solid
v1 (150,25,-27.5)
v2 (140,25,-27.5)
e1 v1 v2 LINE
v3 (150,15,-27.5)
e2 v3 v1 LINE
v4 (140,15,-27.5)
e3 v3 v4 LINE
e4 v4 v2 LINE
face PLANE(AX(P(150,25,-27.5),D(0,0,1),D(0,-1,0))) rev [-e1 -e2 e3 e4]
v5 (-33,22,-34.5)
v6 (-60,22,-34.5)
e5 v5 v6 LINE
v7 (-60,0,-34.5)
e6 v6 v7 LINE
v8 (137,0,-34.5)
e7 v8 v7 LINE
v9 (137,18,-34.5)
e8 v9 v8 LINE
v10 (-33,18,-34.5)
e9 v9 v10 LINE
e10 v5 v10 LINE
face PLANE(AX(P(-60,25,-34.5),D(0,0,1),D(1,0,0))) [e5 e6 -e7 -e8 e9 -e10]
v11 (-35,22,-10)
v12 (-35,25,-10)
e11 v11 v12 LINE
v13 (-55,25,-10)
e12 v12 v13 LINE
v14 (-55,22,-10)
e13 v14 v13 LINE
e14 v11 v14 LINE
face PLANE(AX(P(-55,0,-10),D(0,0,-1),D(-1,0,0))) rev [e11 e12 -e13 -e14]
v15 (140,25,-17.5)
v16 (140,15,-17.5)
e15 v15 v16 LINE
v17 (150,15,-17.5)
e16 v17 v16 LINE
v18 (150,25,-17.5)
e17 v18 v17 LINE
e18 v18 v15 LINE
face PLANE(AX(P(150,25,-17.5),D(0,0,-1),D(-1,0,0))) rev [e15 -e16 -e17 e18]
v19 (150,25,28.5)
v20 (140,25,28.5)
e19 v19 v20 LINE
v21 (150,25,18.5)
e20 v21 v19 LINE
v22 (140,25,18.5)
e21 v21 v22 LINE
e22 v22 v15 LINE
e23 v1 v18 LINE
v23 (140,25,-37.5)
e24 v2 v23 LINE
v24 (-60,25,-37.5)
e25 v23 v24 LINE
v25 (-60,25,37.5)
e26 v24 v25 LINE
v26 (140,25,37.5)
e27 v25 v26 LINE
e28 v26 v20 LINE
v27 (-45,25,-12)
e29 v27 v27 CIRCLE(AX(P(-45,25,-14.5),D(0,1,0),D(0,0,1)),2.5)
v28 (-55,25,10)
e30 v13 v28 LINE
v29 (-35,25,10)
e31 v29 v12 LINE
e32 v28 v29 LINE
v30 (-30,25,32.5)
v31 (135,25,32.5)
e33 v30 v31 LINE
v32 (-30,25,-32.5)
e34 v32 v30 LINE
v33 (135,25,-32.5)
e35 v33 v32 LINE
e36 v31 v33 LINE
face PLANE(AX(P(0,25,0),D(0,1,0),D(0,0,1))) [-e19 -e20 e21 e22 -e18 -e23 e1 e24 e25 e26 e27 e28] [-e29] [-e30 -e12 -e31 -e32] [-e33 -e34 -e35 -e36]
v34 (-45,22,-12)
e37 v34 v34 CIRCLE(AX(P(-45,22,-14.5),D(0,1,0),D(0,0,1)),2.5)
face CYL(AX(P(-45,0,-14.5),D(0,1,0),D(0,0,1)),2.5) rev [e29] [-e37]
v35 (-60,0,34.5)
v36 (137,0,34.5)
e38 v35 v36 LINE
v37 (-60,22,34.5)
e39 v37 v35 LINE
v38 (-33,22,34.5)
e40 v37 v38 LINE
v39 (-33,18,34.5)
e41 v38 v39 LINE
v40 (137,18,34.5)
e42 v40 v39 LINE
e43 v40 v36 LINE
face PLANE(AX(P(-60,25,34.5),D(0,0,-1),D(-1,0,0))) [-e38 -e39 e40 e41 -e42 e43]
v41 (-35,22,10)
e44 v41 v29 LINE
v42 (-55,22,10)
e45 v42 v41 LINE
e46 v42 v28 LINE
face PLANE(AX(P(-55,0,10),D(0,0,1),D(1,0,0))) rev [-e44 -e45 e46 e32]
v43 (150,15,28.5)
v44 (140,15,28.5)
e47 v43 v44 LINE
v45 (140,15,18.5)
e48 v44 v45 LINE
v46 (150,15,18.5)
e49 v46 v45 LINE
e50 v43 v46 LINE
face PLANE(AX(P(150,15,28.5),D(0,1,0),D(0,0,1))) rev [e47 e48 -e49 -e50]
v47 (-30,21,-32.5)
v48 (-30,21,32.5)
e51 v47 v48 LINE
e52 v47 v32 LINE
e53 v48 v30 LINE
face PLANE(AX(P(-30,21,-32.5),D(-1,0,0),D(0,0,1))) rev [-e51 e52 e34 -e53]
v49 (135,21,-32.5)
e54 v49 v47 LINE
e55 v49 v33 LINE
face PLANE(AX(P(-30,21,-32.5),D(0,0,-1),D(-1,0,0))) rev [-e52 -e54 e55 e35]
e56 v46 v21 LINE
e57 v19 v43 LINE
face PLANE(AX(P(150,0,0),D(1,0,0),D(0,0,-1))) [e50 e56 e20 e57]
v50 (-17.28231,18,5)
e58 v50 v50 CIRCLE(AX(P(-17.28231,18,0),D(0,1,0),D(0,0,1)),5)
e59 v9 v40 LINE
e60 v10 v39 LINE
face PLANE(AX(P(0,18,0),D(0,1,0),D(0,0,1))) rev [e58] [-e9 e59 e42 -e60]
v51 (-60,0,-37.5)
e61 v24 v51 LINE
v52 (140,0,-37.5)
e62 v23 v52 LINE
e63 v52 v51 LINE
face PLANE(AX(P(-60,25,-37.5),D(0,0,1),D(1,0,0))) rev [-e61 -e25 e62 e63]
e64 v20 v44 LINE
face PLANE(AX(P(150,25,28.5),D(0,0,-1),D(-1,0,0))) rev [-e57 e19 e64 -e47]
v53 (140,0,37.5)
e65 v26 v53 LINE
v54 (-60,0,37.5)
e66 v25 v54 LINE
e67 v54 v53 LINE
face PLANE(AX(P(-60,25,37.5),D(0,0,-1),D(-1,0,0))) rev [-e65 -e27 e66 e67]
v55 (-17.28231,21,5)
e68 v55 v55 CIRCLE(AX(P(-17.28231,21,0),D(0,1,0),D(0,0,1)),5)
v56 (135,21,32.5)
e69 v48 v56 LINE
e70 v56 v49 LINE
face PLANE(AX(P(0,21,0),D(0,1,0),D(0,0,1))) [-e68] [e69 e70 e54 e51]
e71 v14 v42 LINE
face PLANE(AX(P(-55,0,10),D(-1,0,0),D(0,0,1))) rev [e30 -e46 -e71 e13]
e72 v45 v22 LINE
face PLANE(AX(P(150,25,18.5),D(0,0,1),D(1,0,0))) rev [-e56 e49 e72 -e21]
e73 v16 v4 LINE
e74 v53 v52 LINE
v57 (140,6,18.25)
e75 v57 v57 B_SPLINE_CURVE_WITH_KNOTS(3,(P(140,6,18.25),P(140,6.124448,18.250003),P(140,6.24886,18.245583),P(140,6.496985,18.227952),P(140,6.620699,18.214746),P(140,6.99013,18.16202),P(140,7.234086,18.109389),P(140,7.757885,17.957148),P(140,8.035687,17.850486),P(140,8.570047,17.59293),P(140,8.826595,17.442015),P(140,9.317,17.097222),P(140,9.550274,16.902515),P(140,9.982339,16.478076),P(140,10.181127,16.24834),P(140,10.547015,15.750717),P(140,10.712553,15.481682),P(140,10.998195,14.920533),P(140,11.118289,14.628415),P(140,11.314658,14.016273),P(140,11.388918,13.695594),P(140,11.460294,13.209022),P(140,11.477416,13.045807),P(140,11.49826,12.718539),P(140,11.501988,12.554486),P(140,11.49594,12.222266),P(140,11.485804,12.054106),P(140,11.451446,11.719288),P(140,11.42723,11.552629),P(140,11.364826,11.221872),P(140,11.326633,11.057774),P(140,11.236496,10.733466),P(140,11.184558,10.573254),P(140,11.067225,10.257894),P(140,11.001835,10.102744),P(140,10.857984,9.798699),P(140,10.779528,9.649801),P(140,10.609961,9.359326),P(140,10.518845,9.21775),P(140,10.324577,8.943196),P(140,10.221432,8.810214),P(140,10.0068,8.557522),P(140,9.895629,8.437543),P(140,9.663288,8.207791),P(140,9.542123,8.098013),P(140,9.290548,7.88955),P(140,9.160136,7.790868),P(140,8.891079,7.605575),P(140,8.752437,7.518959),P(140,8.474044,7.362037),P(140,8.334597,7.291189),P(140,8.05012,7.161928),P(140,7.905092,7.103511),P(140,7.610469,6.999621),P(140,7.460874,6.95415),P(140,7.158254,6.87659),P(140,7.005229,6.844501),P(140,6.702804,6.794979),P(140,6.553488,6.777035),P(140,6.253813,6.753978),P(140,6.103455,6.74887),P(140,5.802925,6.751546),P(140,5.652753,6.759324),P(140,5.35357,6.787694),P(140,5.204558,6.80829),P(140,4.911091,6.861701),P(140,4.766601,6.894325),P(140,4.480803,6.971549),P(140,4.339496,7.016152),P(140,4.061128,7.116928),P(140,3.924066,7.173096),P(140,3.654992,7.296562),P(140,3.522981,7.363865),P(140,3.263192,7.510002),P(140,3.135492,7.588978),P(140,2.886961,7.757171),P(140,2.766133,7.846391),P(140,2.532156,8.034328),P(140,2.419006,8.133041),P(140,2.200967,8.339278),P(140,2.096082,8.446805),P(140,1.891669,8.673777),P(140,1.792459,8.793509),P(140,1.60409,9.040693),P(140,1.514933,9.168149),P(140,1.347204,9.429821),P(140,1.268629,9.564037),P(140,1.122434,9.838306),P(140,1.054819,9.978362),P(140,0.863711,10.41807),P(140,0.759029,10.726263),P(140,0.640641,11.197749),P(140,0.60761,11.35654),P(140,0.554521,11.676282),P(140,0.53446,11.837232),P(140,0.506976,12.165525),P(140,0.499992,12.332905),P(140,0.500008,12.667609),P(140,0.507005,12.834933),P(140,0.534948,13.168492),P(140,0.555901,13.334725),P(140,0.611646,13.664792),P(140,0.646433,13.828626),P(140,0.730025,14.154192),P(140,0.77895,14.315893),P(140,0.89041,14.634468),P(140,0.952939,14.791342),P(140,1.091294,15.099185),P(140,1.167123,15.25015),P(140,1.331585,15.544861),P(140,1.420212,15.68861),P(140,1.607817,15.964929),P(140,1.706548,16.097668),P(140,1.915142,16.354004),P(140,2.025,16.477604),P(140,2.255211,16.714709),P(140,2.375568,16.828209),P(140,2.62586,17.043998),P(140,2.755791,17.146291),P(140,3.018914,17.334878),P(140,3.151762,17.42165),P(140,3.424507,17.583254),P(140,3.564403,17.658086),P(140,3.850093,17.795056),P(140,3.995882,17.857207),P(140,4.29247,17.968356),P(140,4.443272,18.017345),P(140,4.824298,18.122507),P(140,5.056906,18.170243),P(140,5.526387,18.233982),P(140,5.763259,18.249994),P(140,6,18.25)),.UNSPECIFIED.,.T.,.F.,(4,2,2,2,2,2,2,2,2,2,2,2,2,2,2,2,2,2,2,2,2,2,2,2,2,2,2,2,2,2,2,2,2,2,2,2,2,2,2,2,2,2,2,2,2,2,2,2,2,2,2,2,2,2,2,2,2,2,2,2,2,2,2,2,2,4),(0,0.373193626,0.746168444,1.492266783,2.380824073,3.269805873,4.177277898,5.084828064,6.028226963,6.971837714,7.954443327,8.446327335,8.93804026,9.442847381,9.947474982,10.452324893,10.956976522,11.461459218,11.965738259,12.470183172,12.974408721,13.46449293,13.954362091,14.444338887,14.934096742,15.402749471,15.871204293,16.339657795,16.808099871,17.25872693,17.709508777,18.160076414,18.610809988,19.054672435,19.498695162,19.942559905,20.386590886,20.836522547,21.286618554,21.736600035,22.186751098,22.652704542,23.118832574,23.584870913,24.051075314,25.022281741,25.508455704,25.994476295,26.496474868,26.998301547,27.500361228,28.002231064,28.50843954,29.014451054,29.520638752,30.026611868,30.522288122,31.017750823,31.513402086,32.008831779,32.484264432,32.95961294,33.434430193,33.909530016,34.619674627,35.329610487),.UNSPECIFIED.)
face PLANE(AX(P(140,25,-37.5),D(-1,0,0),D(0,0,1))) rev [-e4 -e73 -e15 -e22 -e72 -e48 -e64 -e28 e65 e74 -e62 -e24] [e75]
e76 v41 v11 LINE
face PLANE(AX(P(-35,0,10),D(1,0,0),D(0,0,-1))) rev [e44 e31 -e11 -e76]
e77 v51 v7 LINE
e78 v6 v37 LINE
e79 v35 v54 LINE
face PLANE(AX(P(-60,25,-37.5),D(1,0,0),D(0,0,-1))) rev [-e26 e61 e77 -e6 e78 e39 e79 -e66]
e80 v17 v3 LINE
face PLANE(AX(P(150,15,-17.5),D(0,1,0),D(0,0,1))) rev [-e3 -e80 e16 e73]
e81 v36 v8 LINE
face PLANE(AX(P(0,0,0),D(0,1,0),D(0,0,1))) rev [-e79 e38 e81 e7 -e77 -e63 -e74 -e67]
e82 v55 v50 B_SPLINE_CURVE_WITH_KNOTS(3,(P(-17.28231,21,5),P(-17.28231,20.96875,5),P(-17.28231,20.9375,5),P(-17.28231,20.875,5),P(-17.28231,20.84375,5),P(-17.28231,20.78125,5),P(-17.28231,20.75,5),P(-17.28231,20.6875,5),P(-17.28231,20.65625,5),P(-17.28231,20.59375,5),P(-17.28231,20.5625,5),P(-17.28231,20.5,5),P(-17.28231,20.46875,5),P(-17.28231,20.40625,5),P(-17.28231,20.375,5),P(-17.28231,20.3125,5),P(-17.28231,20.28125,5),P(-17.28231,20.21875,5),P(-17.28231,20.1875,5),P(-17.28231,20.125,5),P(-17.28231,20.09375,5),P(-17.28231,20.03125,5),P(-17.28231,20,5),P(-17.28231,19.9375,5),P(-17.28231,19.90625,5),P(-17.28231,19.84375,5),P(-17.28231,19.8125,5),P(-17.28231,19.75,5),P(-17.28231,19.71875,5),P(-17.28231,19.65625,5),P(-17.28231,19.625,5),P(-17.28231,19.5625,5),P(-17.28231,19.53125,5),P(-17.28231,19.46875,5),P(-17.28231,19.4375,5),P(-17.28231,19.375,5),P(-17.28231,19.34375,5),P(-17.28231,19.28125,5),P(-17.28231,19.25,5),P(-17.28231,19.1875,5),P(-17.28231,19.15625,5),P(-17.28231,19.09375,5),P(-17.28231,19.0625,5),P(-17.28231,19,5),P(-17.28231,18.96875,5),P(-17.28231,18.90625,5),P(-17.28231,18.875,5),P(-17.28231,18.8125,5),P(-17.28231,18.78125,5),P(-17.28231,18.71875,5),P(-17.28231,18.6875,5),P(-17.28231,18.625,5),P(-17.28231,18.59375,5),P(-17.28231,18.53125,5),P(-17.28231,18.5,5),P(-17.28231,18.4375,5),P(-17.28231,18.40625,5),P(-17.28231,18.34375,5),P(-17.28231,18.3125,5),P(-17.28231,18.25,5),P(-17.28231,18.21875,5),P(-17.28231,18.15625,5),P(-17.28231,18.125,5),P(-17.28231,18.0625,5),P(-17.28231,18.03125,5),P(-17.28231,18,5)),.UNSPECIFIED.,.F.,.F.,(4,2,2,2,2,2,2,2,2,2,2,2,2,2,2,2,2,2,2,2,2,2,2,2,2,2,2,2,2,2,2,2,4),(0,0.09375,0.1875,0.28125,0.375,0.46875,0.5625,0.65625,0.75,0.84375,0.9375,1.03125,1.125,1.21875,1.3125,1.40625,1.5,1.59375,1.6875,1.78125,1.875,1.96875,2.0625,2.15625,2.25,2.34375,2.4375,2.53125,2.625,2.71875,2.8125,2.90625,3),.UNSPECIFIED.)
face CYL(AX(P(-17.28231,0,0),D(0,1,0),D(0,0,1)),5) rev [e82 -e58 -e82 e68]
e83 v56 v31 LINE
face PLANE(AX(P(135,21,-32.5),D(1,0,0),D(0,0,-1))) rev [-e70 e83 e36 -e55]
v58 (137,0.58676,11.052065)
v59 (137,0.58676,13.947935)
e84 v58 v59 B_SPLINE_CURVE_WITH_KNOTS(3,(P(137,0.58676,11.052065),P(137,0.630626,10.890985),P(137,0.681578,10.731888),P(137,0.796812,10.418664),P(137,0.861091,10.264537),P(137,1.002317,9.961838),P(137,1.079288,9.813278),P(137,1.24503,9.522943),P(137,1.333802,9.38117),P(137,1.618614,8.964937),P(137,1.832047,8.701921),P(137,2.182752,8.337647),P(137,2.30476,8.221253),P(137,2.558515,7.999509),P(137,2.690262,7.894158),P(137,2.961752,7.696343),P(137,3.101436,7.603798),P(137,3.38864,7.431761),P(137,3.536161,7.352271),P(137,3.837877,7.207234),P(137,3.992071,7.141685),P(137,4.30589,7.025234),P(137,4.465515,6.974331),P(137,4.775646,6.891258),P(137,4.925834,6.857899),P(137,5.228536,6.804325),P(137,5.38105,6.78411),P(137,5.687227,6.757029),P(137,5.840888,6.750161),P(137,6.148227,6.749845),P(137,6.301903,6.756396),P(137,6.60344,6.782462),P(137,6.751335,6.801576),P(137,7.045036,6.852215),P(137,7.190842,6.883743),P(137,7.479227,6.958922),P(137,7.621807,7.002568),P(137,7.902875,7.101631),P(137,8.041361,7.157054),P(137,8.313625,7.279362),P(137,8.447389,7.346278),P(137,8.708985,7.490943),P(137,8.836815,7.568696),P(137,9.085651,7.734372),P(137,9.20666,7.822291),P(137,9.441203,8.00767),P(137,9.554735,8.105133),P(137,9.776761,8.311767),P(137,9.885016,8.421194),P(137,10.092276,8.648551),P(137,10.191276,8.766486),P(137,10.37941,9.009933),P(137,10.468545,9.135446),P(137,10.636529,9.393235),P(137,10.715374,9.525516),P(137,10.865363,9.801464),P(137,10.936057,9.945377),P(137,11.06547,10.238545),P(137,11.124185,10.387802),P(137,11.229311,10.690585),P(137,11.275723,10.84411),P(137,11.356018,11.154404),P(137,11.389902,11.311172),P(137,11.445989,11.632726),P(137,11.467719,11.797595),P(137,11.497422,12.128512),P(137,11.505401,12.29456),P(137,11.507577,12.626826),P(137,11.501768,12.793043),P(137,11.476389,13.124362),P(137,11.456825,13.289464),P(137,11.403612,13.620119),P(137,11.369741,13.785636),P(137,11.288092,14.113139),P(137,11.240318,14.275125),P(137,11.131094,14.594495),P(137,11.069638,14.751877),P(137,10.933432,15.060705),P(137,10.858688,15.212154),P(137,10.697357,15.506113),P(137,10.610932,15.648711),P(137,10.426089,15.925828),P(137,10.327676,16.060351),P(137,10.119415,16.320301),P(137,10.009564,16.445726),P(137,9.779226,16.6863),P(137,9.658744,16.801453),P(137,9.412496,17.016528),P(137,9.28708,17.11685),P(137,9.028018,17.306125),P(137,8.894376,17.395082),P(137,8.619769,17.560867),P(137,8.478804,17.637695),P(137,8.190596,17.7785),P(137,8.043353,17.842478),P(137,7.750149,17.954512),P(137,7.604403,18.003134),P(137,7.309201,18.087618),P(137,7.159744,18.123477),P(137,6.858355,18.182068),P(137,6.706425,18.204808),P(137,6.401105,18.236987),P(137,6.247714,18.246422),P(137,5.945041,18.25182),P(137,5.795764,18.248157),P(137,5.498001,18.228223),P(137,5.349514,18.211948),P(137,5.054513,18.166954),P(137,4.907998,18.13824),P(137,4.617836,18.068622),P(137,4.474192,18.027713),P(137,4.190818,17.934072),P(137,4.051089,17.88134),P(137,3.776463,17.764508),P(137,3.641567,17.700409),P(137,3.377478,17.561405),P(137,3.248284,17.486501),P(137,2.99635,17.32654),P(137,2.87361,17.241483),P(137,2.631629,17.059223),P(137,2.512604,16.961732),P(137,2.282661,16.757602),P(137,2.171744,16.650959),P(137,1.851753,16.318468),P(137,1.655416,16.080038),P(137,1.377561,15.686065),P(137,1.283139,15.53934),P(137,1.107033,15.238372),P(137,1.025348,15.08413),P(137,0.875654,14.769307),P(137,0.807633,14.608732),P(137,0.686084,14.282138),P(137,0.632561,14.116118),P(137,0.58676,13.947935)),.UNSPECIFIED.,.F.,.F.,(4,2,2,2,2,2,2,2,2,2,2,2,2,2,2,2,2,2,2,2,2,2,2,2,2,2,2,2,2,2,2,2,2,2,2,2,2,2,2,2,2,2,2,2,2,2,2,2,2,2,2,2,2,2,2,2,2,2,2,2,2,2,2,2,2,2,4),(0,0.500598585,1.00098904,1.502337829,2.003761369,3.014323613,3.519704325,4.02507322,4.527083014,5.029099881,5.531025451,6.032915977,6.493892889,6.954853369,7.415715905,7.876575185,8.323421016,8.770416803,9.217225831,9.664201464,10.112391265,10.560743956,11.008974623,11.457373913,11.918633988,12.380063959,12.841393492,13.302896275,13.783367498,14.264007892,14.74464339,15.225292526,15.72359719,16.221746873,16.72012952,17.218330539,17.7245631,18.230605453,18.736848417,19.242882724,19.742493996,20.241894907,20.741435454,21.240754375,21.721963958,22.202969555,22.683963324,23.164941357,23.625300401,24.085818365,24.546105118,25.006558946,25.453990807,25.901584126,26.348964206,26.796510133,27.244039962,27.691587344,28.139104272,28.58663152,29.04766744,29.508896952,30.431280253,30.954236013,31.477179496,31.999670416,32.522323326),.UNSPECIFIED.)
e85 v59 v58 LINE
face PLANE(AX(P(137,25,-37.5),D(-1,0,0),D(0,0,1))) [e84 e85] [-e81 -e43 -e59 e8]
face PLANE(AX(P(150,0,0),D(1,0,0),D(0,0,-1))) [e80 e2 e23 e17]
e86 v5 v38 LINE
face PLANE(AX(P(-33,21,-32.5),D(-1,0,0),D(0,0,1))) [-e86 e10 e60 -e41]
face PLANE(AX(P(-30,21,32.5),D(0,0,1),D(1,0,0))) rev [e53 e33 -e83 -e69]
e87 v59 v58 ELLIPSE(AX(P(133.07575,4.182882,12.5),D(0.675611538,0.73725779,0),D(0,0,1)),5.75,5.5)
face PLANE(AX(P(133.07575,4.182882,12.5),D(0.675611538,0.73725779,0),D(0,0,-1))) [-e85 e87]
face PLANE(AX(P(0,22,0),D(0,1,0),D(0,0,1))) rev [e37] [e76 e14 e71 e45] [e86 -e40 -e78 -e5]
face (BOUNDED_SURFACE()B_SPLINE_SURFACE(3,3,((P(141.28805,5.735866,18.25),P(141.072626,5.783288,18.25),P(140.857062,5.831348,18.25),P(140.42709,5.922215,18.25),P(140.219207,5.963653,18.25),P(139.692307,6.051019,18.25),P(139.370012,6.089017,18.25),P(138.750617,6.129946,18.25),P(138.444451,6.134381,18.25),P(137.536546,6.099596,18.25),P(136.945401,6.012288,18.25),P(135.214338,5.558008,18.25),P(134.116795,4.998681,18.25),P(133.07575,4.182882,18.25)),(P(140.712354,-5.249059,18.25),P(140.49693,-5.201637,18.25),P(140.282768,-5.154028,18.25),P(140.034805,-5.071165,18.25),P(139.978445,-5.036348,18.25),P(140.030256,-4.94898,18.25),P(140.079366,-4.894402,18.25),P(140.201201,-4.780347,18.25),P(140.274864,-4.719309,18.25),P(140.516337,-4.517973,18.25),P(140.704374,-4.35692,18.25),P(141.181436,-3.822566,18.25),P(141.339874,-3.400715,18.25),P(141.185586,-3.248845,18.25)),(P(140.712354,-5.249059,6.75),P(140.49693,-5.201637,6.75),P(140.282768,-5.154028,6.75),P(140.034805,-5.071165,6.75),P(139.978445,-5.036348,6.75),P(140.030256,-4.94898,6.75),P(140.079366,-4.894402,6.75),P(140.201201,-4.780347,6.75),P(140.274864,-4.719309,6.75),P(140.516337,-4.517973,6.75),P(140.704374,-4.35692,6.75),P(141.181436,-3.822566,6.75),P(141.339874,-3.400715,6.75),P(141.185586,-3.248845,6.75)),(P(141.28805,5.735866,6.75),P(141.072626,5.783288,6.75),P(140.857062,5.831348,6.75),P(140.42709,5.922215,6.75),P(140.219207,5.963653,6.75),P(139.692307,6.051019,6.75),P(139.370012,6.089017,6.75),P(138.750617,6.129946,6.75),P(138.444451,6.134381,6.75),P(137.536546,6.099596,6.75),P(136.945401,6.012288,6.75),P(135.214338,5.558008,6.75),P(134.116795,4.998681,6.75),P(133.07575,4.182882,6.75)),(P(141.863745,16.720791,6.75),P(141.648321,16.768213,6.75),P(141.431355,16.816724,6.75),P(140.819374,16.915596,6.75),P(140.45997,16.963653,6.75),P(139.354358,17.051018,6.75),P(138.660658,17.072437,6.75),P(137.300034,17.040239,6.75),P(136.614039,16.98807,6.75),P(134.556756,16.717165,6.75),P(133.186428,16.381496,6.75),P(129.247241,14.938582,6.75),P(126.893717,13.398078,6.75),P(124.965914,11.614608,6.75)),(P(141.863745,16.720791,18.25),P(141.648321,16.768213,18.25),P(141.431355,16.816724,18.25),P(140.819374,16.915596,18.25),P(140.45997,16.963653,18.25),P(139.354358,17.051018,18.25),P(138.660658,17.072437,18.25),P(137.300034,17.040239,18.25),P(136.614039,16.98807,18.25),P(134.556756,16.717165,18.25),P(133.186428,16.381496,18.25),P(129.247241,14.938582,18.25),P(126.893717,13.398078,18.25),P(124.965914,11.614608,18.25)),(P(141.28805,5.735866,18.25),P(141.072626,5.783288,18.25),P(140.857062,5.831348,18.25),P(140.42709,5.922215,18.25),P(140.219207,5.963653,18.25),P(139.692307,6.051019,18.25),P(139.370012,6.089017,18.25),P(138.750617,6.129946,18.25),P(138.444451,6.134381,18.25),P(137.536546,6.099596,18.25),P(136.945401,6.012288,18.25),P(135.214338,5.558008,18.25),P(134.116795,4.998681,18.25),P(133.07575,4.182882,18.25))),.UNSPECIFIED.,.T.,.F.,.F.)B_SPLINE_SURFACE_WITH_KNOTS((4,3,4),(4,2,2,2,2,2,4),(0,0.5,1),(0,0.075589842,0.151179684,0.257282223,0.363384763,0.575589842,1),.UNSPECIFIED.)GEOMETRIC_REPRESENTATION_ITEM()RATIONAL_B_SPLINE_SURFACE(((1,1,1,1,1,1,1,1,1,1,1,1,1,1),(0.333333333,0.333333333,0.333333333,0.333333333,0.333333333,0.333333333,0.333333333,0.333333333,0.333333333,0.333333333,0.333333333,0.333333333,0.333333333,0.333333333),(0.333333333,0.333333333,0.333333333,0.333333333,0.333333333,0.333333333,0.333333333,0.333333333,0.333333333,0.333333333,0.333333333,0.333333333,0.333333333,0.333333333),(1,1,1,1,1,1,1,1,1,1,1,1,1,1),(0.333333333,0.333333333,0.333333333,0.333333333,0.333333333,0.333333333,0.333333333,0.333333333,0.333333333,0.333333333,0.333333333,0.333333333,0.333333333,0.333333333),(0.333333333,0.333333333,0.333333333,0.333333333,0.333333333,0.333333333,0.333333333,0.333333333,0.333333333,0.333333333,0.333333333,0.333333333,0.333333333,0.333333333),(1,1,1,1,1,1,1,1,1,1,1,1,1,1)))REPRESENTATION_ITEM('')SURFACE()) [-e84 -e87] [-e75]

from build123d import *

# Parameters (mm, degrees)
SKETCH1_W           = 200
SKETCH1_H           = 75
BOSS_EXTRUDE1_DEPTH = 25
SKETCH9_W           = 165
SKETCH9_H           = 65
CUT_EXTRUDE5_DEPTH  = 4
SHELL3_START        = -34.5
SHELL3_DEPTH        = 69
SKETCH14_W          = 10
SKETCH14_H          = 10
BOSS_EXTRUDE5_DEPTH = 10
SKETCH15_R          = 5
CUT_EXTRUDE7_DEPTH  = 157.036053526
SKETCH16_W          = 20
SKETCH16_H          = 20
CUT_EXTRUDE8_DEPTH  = 157.624551077
SKETCH19_RX         = 5.75
SKETCH19_RY         = 5.5
SKETCH21_R          = 2.5
CUT_EXTRUDE9_DEPTH  = 157.624551117


# Read off the part's stored shape, not the designer's step: Shell3
with BuildPart() as part:
    # Sketch1 → Boss-Extrude1 (new body)
    with BuildSketch(Plane(origin=(0, 0, 0), x_dir=(1, 0, 0), z_dir=(0, 1, 0))):
        with Locations((40, 0)):
            Rectangle(SKETCH1_W, SKETCH1_H)
    extrude(amount=BOSS_EXTRUDE1_DEPTH)

    # Sketch9 → Cut-Extrude5 (cut)
    with BuildSketch(Plane(origin=(0, 25, 0), x_dir=(1, 0, 0), z_dir=(0, 1, 0))):
        with Locations((52.5, 0)):
            Rectangle(SKETCH9_W, SKETCH9_H)
    extrude(amount=-CUT_EXTRUDE5_DEPTH, mode=Mode.SUBTRACT)

    # Shell3 outline → Shell3 (cut)
    with BuildSketch(Plane.XY.offset(SHELL3_START)):
        Polygon((137, 0), (137, 18), (-33, 18), (-33, 22), (-60, 22), (-60, 0), align=None)
    extrude(amount=SHELL3_DEPTH, mode=Mode.SUBTRACT)

    # Sketch14 → Boss-Extrude5 (add)
    with BuildSketch(Plane(origin=(140, 0, 0), x_dir=(0, 0, -1), z_dir=(1, 0, 0))):
        with Locations((-23.5, 20)):
            Rectangle(SKETCH14_W, SKETCH14_H)
        with Locations((22.5, 20)):
            Rectangle(SKETCH14_W, SKETCH14_H)
    extrude(amount=BOSS_EXTRUDE5_DEPTH)

    # Sketch15 → Cut-Extrude7 (cut, through all)
    with BuildSketch(Plane(origin=(0, 21, 0), x_dir=(1, 0, 0), z_dir=(0, 1, 0))):
        with Locations(Location((-17.28231035, 0, 0), (0, 0, 270))):
            Circle(SKETCH15_R)
    extrude(amount=-CUT_EXTRUDE7_DEPTH, mode=Mode.SUBTRACT)

    # Sketch16 → Cut-Extrude8 (cut, through all)
    with BuildSketch(Plane(origin=(0, 25, 0), x_dir=(1, 0, 0), z_dir=(0, 1, 0))):
        with Locations((-45, 0)):
            Rectangle(SKETCH16_W, SKETCH16_H)
    extrude(amount=-CUT_EXTRUDE8_DEPTH, mode=Mode.SUBTRACT)

    # Cut-Sweep2: sweep along a path in Sketch20
    with BuildLine() as cut_sweep2_path:  # in the path sketch's own coordinates; laid on its plane below (add() does not lay a ready-made edge on the line's plane)
        add(Edge.make_bspline(
            [(-140, 6), (-136.19888528, 6.630281352), (-133.075750061, 4.182881523)],
            knots=[0, 0, 0, 1, 1, 1], degree=2))
    # Sketch19 → Cut-Sweep2 (sweep, cut)
    with BuildSketch(Plane(origin=(140, 0, 0), x_dir=(0, 0, -1), z_dir=(1, 0, 0))):
        with Locations(Location((-12.5, 6), (0, 0, 0))):
            Ellipse(SKETCH19_RX, SKETCH19_RY)
    sweep(path=Plane(origin=(0, 0, 0), x_dir=(-1, 0, 0), z_dir=(0, 0, -1)) * cut_sweep2_path.line, mode=Mode.SUBTRACT)

    # Sketch21 → Cut-Extrude9 (cut, through all)
    with BuildSketch(Plane(origin=(0, 25, 0), x_dir=(1, 0, 0), z_dir=(0, 1, 0))):
        with Locations(Location((-45, 14.5, 0), (0, 0, 270))):
            Circle(SKETCH21_R)
    extrude(amount=-CUT_EXTRUDE9_DEPTH, mode=Mode.SUBTRACT)


solid = part.part
